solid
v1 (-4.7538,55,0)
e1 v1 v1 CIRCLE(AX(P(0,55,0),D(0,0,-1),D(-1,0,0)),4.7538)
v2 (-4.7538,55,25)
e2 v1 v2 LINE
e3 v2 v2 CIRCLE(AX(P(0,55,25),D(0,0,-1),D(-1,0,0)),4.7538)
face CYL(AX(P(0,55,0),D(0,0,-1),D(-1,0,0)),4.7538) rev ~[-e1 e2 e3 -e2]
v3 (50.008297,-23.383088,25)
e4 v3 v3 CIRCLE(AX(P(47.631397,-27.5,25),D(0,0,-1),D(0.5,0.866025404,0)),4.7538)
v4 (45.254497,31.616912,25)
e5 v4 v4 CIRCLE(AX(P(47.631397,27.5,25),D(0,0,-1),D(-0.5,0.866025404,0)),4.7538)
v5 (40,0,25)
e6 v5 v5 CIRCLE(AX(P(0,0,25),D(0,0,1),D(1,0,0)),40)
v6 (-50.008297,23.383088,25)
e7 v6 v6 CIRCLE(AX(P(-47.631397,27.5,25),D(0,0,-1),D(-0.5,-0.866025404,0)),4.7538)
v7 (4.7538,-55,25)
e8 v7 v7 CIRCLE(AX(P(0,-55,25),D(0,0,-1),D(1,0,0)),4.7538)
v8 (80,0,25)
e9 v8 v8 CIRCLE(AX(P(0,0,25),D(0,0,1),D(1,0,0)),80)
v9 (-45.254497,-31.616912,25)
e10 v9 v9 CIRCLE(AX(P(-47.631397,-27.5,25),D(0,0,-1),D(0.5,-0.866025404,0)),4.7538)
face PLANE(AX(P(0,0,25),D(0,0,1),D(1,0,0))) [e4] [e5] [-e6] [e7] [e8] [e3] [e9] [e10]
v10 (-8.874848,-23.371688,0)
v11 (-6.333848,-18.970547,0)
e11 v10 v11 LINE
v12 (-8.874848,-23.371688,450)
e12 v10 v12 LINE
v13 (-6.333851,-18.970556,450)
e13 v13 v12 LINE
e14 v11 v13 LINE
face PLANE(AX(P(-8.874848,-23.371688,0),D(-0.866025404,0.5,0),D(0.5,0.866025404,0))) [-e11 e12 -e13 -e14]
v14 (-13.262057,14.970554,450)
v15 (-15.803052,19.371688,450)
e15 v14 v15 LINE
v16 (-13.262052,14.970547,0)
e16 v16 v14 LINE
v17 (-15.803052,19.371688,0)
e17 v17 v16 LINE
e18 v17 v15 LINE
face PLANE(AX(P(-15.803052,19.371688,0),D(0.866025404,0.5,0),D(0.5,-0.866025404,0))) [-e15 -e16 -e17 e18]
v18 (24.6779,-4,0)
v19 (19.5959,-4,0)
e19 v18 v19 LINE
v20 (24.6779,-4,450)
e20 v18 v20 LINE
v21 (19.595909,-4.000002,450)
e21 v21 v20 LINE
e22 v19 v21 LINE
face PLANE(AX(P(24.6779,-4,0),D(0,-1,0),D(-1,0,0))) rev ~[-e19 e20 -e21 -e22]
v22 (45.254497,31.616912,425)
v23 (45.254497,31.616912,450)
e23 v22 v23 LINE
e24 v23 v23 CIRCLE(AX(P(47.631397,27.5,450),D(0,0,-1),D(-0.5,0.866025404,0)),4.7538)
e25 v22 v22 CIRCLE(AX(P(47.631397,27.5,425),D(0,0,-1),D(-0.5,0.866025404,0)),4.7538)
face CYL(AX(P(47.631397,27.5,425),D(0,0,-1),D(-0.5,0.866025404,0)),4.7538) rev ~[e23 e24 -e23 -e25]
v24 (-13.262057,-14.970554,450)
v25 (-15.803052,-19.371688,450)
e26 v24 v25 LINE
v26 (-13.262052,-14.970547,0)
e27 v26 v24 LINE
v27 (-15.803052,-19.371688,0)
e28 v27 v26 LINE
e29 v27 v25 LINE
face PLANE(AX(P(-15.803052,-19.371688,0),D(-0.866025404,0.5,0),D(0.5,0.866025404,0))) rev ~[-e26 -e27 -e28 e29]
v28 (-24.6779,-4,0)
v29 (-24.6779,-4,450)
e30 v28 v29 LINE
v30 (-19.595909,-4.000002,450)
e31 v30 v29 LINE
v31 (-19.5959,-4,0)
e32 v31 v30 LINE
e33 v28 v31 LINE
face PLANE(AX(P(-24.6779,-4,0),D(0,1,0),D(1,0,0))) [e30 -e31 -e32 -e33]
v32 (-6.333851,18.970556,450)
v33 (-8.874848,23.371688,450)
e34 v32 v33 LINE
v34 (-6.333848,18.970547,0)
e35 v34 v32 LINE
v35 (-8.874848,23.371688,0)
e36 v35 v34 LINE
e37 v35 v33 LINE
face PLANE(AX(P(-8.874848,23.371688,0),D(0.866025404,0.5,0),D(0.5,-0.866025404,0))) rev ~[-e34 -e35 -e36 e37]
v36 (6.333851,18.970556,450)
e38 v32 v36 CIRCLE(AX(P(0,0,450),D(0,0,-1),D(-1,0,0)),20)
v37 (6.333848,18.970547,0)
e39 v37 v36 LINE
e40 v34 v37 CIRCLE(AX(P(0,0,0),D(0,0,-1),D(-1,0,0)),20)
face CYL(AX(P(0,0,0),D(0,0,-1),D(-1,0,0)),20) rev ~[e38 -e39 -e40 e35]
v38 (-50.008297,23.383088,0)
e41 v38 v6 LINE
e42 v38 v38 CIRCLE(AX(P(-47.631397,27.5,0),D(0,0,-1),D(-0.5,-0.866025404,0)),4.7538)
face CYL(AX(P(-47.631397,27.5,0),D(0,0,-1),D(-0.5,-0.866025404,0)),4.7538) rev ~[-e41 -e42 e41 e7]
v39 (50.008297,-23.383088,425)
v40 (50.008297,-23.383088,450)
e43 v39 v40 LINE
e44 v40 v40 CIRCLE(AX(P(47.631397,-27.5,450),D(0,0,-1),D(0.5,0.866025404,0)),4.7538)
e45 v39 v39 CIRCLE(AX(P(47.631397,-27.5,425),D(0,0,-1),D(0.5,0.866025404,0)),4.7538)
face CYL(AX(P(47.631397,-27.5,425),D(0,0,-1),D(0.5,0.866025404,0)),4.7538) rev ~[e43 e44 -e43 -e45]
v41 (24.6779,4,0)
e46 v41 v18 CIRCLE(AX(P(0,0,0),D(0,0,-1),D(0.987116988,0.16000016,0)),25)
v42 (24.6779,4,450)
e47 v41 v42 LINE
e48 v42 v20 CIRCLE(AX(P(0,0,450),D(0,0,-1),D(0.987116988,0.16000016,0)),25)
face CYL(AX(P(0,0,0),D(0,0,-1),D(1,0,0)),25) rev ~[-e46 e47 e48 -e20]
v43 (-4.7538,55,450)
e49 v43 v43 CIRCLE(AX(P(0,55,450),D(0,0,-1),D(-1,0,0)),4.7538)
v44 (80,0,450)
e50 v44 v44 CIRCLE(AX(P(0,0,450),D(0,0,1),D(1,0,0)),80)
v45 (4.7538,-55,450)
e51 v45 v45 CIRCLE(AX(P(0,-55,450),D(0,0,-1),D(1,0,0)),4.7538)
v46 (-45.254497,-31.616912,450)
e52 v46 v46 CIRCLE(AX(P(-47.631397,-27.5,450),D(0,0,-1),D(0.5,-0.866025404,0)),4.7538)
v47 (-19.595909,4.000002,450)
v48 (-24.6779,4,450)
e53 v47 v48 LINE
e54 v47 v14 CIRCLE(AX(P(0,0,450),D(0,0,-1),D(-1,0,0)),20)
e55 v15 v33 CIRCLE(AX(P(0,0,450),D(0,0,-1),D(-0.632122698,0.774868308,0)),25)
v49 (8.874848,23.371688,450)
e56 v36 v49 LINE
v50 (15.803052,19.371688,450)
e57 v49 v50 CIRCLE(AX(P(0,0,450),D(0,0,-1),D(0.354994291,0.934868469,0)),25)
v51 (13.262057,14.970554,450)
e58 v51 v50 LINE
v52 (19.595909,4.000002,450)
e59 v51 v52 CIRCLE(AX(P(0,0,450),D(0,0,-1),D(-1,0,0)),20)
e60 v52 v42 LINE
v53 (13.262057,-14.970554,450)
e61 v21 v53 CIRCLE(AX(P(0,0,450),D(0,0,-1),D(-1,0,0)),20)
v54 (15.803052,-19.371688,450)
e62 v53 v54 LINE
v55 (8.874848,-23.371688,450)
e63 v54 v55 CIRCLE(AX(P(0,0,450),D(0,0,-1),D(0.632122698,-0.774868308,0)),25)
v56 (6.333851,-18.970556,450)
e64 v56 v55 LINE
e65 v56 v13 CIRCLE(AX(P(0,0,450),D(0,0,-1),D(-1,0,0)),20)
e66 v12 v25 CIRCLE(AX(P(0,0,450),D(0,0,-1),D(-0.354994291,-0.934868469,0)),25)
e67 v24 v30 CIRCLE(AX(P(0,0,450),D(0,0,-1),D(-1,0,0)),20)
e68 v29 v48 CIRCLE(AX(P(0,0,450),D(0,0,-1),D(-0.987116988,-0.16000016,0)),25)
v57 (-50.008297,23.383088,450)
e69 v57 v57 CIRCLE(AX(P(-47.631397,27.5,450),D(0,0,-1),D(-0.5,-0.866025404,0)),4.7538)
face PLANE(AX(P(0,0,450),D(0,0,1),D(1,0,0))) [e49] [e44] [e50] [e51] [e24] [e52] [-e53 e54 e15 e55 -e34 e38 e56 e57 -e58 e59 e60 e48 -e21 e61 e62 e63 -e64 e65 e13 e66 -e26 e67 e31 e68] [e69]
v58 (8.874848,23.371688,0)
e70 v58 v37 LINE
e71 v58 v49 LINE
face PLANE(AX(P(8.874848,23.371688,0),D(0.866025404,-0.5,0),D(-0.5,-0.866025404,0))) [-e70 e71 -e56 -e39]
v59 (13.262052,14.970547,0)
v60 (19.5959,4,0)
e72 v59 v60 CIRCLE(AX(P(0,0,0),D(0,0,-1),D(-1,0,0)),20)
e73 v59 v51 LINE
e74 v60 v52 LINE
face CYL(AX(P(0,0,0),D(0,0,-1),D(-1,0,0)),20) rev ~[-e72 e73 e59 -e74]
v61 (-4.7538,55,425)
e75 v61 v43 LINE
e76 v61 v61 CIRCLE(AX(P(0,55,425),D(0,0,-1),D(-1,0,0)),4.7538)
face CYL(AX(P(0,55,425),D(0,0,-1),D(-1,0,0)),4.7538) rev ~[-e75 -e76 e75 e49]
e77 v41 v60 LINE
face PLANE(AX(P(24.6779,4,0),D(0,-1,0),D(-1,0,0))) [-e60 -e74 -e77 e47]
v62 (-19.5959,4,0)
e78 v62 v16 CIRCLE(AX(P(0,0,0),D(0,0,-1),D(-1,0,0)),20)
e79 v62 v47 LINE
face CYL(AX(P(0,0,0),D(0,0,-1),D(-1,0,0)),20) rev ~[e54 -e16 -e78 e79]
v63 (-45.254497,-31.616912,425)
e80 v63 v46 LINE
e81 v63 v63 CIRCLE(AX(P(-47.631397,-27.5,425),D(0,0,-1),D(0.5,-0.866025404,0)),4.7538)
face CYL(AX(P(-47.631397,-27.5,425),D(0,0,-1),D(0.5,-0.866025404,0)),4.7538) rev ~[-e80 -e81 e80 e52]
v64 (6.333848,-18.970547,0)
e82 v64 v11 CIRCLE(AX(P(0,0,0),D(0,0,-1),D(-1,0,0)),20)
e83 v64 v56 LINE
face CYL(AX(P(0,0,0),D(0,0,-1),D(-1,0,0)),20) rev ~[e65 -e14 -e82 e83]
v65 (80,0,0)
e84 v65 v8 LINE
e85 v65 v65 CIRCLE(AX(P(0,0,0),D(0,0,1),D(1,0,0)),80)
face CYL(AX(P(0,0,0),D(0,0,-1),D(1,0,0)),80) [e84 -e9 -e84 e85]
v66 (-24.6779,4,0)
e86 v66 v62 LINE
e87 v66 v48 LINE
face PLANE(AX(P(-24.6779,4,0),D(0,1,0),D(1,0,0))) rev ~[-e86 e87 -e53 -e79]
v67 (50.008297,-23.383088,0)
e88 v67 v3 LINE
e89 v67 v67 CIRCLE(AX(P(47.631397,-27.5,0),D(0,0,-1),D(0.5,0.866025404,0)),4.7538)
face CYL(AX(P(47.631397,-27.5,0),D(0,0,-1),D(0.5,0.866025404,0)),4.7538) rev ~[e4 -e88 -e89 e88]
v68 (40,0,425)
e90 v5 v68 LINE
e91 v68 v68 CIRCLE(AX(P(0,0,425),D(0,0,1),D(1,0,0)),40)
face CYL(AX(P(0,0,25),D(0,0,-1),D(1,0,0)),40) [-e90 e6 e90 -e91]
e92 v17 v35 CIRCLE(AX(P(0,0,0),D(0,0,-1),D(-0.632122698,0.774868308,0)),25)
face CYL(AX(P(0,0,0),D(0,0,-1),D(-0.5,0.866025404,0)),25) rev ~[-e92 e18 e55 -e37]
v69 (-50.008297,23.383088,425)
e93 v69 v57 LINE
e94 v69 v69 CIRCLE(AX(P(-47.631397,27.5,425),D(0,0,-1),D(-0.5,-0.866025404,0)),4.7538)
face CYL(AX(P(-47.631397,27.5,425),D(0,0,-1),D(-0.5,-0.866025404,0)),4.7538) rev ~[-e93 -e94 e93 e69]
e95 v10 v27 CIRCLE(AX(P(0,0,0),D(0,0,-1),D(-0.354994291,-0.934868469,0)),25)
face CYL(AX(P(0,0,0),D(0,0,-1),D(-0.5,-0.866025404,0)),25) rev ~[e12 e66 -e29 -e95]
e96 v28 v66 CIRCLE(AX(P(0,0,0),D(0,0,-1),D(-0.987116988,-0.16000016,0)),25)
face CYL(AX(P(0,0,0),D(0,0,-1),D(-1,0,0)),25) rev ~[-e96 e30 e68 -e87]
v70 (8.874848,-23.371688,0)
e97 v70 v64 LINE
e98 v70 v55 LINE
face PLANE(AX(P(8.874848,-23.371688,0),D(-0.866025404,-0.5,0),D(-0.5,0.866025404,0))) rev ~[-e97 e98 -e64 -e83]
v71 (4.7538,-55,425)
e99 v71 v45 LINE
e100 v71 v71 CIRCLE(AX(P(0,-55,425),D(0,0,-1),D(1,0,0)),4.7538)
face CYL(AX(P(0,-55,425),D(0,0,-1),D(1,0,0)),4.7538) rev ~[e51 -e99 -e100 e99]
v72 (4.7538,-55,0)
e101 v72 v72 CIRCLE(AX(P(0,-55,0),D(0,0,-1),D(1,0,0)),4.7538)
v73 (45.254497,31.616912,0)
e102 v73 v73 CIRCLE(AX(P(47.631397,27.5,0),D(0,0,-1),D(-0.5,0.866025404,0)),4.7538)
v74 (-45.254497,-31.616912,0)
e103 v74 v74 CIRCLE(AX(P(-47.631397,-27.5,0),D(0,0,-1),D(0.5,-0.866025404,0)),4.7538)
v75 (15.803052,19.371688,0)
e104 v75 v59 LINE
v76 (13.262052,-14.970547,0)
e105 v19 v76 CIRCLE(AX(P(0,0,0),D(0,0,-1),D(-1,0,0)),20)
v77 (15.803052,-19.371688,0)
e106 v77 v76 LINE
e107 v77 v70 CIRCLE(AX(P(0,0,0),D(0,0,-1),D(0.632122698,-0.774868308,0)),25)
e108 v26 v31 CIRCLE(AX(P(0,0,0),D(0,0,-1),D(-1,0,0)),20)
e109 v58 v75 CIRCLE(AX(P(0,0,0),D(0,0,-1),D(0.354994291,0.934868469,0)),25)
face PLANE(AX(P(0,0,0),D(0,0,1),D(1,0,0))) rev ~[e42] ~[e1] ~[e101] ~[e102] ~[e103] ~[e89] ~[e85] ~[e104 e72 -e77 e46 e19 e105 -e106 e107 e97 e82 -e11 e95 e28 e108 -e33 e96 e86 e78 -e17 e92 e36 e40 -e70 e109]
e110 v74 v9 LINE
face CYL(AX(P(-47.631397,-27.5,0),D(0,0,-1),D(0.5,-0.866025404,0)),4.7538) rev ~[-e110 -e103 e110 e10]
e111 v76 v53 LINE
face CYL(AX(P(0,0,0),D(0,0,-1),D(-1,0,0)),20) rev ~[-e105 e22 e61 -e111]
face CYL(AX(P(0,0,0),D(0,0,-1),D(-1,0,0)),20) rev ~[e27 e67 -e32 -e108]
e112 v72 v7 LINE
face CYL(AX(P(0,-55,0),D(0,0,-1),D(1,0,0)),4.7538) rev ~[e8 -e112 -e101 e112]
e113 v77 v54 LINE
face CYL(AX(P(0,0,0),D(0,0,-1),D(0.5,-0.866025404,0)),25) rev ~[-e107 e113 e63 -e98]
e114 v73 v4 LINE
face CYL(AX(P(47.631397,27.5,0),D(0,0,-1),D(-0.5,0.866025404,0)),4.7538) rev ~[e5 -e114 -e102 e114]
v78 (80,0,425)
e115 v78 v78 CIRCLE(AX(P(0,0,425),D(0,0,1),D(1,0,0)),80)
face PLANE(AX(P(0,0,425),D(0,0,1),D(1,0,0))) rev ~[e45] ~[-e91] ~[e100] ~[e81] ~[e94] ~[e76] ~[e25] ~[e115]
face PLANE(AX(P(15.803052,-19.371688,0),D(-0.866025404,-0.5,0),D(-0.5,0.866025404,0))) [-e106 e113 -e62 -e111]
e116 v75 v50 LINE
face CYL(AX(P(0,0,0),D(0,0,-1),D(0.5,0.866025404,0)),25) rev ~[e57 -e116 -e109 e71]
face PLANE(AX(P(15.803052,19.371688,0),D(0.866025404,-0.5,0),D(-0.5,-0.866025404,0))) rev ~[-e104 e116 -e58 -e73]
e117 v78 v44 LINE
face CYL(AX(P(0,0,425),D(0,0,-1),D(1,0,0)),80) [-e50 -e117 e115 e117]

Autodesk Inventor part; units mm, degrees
ref_plane "YZ Plane" through (0, 0, 0) normal (1, 0, 0) x (0, 1, 0)
ref_plane "XZ Plane" through (0, 0, 0) normal (0, 1, 0) x (-1, 0, 0)
ref_plane "XY Plane" through (0, 0, 0) normal (0, 0, 1) x (1, 0, 0)
sketch "草图1" plane through (0, 0, 0) normal (0, 0, 1) x (1, 0, 0)
  circle A0 centre (0, 0) radius 80
  dimension "d0" = 160
extrude "拉伸1" add sketch "草图1" along normal blind 25
sketch "草图2" plane through (0, 0, 25) normal (0, 0, 1) x (1, 0, 0)
  circle A0 centre (0, 0) radius 40
  dimension "d3" = 80
extrude "拉伸2" add sketch "草图2" along normal blind 400
sketch "草图3" plane through (0, 0, 0) normal (0, 0, -1) x (-1, 0, 0)
  circle A0 centre (0, 55) radius 4.7538
  line L0 (0, 0) -> (0, 9.1463)
  dimension "d6" = 9.1463
  dimension "d7" = 55
extrude "拉伸3" cut sketch "草图3" against normal through all
pattern_circular "环形阵列1" count 6 over 360 about axis through (0, 0, -10) along (0, 0, 1) of "拉伸3"
pattern_linear "矩形阵列1" count 2 spacing 425 along (0, 0, 1) of "拉伸3", "环形阵列1", "拉伸1"
sketch "草图4" plane through (0, 0, 0) normal (0, 0, -1) x (-1, 0, 0)
  circle A0 centre (0, 0) radius 20
  dimension "d16" = 40
extrude "拉伸4" cut sketch "草图4" against normal through all
sketch "草图5" plane through (0, 0, 0) normal (0, 0, -1) x (-1, 0, 0)
  circle A0 centre (0, 0) radius 25
  circle A1 centre (0, 0) radius 20
  circle A2 centre (0, 0) radius 20 projected
  line L0 (24.6779, 4) -> (19.5959, 4)
  line L1 (24.6779, -4) -> (19.5959, -4)
  line L2 (0, 0) -> (7.5201, 0)
  dimension "d19" = 50
  dimension "d20" = 7.5201
  dimension "d21" = 4
  dimension "d22" = 8
extrude "拉伸5" cut sketch "草图5" against normal through all contours A0 L1 A1 L0 picked at (21.5439, 2.2304)
pattern_circular "环形阵列2" count 6 over 360 about axis through (0, 0, -10) along (0, 0, 1) of "拉伸5"
properties part number "主动轮连接筒"
